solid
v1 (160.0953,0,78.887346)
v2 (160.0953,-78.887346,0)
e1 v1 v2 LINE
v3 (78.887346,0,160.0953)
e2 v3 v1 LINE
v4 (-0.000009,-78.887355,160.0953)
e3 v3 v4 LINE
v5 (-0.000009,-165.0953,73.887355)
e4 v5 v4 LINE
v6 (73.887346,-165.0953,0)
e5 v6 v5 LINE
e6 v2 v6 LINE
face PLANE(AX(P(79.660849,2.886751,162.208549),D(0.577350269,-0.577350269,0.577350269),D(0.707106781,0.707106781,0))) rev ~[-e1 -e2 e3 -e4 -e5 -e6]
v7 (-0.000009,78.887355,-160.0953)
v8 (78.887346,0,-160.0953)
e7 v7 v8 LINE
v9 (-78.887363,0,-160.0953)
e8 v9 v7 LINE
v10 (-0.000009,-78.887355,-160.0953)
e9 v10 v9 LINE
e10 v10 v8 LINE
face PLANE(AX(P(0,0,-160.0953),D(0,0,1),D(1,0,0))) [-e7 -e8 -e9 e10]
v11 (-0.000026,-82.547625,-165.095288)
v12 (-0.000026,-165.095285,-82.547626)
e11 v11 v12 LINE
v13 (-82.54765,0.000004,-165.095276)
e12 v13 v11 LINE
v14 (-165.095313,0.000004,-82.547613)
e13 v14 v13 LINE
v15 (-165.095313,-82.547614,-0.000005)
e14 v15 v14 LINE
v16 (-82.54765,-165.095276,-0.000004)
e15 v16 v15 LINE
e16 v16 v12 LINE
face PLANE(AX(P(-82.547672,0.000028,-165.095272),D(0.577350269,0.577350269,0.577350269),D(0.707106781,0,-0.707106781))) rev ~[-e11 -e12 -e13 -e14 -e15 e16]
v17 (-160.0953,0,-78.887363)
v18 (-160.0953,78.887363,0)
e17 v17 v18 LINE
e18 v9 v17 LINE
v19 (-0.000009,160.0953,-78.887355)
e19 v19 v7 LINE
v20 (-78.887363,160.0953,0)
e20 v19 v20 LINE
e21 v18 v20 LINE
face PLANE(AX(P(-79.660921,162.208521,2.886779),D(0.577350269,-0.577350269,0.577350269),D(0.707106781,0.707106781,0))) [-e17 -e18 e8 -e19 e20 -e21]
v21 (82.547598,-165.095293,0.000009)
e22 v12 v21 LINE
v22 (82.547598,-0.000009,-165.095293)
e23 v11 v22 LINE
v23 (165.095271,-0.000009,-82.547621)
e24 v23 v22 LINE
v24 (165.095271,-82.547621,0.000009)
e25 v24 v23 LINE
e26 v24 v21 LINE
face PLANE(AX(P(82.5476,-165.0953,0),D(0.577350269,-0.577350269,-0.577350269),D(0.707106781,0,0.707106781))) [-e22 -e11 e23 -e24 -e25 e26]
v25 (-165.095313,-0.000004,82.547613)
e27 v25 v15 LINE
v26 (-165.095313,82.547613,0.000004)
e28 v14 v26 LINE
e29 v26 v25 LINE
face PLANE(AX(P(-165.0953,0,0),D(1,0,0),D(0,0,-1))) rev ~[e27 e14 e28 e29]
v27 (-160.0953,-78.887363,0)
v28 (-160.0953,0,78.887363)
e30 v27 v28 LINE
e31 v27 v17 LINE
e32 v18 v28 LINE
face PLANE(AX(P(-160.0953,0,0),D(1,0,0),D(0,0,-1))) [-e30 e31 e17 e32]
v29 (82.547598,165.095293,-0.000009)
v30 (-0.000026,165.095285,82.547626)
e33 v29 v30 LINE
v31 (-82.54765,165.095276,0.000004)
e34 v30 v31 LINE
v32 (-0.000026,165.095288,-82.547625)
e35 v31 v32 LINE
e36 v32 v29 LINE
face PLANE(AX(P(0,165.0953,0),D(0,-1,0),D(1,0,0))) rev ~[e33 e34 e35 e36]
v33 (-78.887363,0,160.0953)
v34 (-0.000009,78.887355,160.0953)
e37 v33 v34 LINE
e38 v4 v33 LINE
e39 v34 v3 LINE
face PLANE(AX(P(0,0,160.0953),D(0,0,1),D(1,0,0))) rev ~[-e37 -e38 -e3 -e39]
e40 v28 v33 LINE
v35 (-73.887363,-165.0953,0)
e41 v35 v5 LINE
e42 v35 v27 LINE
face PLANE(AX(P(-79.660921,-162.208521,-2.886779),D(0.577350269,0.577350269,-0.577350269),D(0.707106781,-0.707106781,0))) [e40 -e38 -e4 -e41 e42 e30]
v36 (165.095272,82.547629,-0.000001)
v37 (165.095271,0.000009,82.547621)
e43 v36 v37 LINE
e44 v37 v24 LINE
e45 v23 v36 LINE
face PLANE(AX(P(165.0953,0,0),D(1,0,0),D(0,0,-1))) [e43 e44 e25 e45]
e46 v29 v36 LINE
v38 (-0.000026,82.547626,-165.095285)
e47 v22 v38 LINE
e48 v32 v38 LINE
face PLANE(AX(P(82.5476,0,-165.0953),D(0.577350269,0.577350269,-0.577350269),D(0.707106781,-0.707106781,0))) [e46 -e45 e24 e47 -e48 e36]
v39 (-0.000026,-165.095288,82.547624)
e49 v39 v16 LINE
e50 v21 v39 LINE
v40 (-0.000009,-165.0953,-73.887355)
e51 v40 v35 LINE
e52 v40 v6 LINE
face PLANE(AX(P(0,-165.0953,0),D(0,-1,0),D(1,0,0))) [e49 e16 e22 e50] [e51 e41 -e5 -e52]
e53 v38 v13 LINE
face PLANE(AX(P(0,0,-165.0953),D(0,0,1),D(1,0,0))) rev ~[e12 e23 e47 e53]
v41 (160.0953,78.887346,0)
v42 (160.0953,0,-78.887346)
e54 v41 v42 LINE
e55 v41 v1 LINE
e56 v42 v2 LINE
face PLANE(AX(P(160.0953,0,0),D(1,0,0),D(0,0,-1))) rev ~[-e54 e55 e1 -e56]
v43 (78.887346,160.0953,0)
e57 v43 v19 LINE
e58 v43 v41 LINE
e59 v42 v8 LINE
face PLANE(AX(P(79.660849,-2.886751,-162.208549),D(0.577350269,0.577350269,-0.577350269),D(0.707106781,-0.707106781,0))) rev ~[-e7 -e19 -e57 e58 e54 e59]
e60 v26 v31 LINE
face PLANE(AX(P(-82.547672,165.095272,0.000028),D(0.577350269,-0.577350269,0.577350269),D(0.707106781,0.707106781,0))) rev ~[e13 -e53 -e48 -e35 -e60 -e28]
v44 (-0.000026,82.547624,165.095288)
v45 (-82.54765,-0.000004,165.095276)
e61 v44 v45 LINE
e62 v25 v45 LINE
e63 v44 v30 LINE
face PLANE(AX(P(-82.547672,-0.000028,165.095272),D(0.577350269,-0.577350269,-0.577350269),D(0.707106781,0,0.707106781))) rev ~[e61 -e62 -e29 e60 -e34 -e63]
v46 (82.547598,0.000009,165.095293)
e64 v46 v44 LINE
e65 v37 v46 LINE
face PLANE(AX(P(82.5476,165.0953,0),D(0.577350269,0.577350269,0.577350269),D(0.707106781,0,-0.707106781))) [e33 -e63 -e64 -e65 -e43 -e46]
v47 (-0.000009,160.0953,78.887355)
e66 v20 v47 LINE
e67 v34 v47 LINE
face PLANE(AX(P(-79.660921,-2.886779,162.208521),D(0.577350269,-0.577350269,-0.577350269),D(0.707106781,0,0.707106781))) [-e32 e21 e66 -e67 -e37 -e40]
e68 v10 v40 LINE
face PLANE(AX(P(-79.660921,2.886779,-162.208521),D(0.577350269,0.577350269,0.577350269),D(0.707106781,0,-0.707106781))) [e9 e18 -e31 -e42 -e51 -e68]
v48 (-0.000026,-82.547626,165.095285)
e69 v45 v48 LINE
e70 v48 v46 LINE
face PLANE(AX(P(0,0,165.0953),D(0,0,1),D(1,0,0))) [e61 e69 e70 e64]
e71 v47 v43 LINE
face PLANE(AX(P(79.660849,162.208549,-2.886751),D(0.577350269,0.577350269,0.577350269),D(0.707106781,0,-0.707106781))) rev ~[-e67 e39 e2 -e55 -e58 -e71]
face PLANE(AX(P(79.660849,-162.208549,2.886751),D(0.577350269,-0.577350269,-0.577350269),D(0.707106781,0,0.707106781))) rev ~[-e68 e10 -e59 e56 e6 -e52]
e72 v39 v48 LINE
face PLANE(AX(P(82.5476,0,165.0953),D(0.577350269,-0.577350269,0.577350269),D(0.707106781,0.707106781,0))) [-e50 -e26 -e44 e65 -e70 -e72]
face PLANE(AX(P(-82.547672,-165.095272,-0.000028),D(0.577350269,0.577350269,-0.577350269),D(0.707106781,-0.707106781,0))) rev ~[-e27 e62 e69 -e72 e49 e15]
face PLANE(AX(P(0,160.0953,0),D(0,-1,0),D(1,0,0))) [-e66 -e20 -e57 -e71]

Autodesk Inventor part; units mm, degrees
ref_plane "YZ Plane" through (0, 0, 0) normal (1, 0, 0) x (0, 1, 0)
ref_plane "XZ Plane" through (0, 0, 0) normal (0, 1, 0) x (-1, 0, 0)
sketch "Sketch26" plane through (0, 0, 0) normal (0, 0, 1) x (1, 0, 0)
  line L0 (82.5476, 0) -> (0, 82.5476)
  line L1 (0, 82.5476) -> (-82.5476, 0)
  line L2 (-82.5476, 0) -> (0, -82.5476)
  line L3 (0, -82.5476) -> (82.5476, 0)
  line L4 (-58.37, -58.37) -> (58.37, 58.37) construction
  line L5 (58.37, -58.37) -> (-58.37, 58.37) construction
  point P0 (0, 0)
  dimension "d97" = 116.74
  dimension "d98" = 165.0953
extrude "Extrusion9" add sketch "Sketch26" along normal mid plane 330.1906
pattern_circular "Circular Pattern14" count 4 over 360 about axis through (-10, 0, 0) along (1, 0, 0) of "Extrusion9"
pattern_circular "Circular Pattern15" count 4 over 360 about axis through (0, -10, 0) along (0, 1, 0) of "Extrusion9"
ref_plane "Work Plane9" through (82.5476, 165.0953, 0) normal (0.5773503, 0.5773503, 0.5773503) x (0.7071068, 0, -0.7071068)
sketch "Sketch27" plane through (82.5476, 165.0953, 0) normal (0.5773503, 0.5773503, 0.5773503) x (0.7071068, 0, -0.7071068)
  line L0 (-116.74, -67.3999) -> (-116.74, 0) projected
  line L1 (-116.74, 0) -> (0, 0)
  line L2 (0, 0) -> (58.37, -101.0998)
  line L3 (58.37, -101.0998) -> (0, -202.1996)
  line L4 (0, -202.1996) -> (-116.74, -202.1996)
  line L5 (-116.74, -202.1996) -> (-175.11, -101.0998)
  line L6 (-175.11, -101.0998) -> (-116.74, 0)
  point P0 (-58.37, -101.0998)
  point P1 (-58.37, -101.0998)
extrude "Extrusion10" add sketch "Sketch27" against normal up to surface (285.9534 mm away)
pattern_circular "Circular Pattern16" count 4 over 360 about axis through (-10, 0, 0) along (1, 0, 0) of "Extrusion10"
shell "Shell2" thickness 5 removed faces 1 at (0, -165.0953, -27.5159)
equation "\"d99\" = 2 * d98"
equation "\"d107\" = 2 * d98"
properties part number "Dome" material "Glass"
